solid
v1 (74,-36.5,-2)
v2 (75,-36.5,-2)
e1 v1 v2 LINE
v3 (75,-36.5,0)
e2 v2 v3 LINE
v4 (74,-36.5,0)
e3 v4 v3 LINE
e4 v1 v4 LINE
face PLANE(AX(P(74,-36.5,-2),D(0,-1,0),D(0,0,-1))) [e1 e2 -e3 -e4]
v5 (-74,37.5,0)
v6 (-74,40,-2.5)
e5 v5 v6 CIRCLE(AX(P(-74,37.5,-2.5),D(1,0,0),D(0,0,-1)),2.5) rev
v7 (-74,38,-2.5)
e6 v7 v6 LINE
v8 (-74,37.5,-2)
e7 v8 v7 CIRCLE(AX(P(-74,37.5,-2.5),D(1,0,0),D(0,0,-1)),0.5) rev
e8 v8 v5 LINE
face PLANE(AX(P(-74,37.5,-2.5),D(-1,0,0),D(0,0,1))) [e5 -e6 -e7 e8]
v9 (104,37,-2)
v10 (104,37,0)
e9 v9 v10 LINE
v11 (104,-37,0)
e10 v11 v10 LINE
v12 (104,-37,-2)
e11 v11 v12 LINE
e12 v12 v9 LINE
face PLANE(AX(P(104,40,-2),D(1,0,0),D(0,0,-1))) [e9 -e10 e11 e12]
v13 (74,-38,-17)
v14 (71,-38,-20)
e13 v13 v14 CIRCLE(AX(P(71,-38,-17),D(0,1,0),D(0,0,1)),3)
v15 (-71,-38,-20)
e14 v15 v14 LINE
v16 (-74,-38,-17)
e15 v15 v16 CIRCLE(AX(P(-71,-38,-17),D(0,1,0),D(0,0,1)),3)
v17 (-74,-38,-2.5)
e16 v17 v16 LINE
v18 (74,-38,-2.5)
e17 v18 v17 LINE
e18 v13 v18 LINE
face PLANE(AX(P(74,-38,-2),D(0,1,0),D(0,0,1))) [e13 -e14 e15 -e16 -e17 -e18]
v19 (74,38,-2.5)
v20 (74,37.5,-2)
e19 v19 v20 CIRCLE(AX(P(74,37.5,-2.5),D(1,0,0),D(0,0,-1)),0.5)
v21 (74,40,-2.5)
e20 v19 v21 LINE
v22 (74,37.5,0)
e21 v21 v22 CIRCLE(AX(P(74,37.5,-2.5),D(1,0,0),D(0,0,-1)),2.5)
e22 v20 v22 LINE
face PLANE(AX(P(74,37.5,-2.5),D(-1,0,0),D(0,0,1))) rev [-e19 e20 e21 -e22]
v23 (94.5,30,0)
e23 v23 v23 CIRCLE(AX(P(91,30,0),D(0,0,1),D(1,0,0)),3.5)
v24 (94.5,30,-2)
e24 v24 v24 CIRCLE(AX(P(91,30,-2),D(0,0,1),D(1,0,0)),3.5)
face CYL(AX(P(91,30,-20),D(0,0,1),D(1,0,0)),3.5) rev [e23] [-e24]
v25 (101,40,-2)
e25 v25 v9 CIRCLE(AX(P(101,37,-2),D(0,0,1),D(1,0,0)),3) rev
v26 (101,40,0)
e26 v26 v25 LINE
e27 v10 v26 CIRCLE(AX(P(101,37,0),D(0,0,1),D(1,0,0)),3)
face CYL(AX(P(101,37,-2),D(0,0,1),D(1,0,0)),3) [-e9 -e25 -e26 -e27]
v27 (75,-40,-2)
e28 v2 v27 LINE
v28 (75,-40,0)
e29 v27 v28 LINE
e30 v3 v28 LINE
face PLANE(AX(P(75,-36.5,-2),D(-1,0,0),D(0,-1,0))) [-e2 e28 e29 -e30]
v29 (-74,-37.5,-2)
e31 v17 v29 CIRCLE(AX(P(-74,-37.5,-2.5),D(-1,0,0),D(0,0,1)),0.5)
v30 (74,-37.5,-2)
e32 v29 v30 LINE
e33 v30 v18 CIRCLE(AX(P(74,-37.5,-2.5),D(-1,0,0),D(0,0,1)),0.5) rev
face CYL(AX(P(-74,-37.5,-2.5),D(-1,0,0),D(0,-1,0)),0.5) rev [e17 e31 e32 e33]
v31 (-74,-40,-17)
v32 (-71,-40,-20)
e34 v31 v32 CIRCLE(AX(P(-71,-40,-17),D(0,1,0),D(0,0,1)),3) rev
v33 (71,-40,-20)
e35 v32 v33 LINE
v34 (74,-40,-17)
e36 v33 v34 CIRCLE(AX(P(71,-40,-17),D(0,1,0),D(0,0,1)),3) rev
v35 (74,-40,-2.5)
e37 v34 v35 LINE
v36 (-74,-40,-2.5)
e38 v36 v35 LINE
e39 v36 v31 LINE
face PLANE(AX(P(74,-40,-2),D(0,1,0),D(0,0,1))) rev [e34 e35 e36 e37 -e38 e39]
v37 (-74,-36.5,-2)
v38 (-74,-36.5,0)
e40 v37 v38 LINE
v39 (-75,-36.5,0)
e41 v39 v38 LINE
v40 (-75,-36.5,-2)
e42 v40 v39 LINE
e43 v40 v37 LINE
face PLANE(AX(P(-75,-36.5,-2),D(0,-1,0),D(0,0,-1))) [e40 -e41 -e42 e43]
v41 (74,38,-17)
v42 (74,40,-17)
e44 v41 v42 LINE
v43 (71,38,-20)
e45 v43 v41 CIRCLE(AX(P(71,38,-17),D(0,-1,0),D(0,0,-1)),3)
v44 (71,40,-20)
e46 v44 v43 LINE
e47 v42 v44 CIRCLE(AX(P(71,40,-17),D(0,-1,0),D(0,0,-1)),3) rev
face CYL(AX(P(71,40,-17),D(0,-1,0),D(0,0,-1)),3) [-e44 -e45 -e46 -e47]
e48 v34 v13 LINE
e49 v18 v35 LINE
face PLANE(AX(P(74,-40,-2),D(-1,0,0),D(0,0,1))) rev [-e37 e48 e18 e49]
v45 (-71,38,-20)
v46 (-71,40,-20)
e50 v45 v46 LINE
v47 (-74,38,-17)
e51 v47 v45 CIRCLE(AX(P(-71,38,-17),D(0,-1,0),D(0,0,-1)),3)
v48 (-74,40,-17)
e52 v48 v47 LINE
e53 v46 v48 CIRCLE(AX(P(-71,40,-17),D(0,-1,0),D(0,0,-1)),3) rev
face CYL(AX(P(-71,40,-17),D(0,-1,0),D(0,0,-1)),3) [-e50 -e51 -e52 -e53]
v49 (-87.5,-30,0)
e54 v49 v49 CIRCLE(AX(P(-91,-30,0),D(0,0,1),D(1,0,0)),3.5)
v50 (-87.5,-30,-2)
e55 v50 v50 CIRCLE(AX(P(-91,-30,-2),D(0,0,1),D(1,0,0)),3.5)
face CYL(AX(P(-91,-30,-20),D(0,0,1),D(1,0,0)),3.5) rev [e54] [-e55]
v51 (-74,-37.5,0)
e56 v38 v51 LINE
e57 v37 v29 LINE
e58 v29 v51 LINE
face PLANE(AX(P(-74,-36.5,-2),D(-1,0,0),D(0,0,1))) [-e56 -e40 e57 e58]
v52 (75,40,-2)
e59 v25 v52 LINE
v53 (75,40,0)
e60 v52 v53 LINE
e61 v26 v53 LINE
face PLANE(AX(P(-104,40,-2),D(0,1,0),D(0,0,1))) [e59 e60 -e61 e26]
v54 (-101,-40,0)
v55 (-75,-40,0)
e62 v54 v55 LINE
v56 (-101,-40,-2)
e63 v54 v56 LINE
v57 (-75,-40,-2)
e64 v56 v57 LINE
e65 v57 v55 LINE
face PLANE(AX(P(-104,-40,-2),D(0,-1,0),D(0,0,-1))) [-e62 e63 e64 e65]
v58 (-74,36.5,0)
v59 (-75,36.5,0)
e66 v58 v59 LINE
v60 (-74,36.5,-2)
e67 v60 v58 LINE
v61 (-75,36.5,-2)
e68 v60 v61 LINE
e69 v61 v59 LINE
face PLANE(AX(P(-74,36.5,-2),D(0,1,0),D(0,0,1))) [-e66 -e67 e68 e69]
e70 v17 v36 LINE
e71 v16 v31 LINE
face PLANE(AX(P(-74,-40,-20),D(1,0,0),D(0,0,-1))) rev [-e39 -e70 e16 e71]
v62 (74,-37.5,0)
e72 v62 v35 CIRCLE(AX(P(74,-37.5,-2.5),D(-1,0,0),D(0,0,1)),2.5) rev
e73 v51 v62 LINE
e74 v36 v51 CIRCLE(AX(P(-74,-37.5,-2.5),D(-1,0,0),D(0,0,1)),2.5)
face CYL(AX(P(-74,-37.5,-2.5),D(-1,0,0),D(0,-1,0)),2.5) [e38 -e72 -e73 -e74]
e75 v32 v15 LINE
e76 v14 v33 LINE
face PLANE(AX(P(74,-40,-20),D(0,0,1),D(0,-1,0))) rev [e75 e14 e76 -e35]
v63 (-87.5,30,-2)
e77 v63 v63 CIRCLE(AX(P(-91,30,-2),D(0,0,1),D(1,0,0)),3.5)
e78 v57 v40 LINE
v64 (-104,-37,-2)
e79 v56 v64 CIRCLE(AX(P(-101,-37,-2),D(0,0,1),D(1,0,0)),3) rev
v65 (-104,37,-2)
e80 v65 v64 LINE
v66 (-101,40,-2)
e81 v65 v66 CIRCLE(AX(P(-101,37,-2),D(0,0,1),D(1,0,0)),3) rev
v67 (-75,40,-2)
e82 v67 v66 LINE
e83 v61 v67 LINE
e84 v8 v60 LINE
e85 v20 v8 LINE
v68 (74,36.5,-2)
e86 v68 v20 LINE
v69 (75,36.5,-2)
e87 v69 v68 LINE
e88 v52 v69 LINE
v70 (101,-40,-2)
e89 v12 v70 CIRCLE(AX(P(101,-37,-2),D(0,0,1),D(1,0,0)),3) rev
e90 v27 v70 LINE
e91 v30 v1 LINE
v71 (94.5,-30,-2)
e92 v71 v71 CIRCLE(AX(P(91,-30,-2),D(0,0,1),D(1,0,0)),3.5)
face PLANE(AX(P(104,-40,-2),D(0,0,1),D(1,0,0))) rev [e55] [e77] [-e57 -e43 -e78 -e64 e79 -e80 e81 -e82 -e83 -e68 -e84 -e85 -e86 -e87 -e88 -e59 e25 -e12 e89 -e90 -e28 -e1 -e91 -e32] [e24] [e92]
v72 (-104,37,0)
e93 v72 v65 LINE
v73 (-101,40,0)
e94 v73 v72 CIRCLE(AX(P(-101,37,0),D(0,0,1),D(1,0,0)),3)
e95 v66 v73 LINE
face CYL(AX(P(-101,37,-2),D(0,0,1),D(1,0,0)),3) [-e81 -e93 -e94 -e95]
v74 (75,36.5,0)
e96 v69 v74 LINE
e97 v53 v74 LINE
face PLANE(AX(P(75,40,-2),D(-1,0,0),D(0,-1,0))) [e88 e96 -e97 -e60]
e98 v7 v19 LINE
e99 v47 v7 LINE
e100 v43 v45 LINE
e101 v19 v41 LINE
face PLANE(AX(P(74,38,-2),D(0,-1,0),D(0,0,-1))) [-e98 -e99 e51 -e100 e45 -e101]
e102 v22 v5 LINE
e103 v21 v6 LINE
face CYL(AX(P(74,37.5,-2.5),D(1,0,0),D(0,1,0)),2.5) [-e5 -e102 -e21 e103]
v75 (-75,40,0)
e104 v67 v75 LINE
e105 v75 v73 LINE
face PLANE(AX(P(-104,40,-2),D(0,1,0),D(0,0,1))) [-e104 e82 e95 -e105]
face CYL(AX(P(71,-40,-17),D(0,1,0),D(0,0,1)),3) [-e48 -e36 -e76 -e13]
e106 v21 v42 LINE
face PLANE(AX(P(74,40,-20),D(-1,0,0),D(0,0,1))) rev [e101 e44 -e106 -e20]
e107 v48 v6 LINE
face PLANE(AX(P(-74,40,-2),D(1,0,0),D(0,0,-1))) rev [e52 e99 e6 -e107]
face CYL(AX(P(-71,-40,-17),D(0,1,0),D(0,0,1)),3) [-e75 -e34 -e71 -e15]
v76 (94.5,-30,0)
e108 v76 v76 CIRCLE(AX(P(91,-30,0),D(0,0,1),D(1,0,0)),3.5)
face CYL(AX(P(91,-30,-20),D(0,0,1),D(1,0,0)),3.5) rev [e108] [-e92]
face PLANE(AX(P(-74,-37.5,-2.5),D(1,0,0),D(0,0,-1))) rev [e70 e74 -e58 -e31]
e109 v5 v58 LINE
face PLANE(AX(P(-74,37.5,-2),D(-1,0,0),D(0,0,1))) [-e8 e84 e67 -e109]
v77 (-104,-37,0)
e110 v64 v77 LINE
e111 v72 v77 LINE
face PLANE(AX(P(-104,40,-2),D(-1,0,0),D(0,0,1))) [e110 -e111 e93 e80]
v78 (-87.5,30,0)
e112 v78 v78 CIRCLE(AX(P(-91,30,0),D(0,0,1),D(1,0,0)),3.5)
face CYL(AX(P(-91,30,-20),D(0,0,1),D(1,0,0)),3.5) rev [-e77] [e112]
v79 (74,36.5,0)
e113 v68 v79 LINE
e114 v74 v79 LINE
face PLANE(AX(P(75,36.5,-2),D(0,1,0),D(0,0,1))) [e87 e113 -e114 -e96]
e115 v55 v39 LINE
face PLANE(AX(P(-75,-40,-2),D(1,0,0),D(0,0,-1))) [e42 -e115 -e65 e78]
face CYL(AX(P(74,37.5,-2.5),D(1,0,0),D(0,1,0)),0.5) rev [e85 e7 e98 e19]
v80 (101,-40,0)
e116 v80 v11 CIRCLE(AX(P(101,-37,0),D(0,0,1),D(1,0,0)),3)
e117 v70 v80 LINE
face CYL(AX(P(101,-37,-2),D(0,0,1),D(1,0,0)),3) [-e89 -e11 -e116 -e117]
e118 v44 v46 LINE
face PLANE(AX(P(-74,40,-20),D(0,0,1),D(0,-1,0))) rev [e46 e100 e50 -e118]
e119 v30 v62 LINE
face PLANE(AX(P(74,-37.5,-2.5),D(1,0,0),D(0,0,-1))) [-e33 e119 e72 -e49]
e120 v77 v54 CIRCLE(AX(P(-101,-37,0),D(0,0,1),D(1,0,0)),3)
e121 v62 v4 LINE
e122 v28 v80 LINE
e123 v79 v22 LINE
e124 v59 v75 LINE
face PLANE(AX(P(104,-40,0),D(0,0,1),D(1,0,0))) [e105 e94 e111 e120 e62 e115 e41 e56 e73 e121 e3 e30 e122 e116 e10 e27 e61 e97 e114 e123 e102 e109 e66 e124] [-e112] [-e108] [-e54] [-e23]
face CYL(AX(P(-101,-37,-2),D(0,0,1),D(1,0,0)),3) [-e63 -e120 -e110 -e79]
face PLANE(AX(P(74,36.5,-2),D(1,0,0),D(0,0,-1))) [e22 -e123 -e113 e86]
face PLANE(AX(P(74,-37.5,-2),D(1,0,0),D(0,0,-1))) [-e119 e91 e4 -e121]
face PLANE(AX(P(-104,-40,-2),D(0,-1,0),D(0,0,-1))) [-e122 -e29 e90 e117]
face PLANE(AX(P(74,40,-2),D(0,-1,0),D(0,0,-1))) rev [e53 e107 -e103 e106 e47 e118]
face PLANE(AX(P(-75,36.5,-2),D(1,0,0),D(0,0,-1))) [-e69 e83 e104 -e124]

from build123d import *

# Parameters (mm, degrees)
SKETCH_1_W                        = 208
SKETCH_1_H                        = 80
SM_BASE_FLANGE_1_DEPTH            = 2
SM_EDGE_FLANGE_1_STRIP_W          = 9
SM_EDGE_FLANGE_1_STRIP_H          = 2
SM_EDGE_FLANGE_1_STRIP_CUT_DEPTH  = 148
SM_EDGE_FLANGE_1_RELIEF_W         = 10
SM_EDGE_FLANGE_1_RELIEF_H         = 1
SM_EDGE_FLANGE_1_RELIEF_CUT_DEPTH = 2
SM_EDGE_FLANGE_1_DEPTH            = 148
SM_EDGE_FLANGE_2_STRIP_W          = 9
SM_EDGE_FLANGE_2_STRIP_H          = 2
SM_EDGE_FLANGE_2_STRIP_CUT_DEPTH  = 148
SM_EDGE_FLANGE_2_RELIEF_W         = 10
SM_EDGE_FLANGE_2_RELIEF_H         = 1
SM_EDGE_FLANGE_2_RELIEF_CUT_DEPTH = 2
SM_EDGE_FLANGE_2_DEPTH            = 148
SKETCH_10_R                       = 3.5
CUT_EXTRUDE_1_DEPTH               = 114.207773585
FILLET_1_R                        = 3


# Sheet-metal steps are written as plain solids
with BuildPart() as part:
    # Sketch 1 → 基体-法兰1 (new body)
    with BuildSketch(Plane.XY):
        Rectangle(SKETCH_1_W, SKETCH_1_H)
    extrude(amount=-SM_BASE_FLANGE_1_DEPTH)

    # 边线-法兰1 strip (across the edge) → 边线-法兰1 strip cut (cut)
    with BuildSketch(Plane(origin=(-74, 40, -2), x_dir=(0, -1, 0), z_dir=(1, 0, 0))):
        with Locations((-2, -1)):
            Rectangle(SM_EDGE_FLANGE_1_STRIP_W, SM_EDGE_FLANGE_1_STRIP_H)
    extrude(amount=SM_EDGE_FLANGE_1_STRIP_CUT_DEPTH, mode=Mode.SUBTRACT)

    # 边线-法兰1 relief (on the sheet) → 边线-法兰1 relief cut (cut)
    with BuildSketch(Plane(origin=(-74, 37.5, -2), x_dir=(0, -1, 0), z_dir=(0, 0, -1))):
        with Locations((-4, 0.5)):
            Rectangle(SM_EDGE_FLANGE_1_RELIEF_W, SM_EDGE_FLANGE_1_RELIEF_H)
        with Locations((-4, -148.5)):
            Rectangle(SM_EDGE_FLANGE_1_RELIEF_W, SM_EDGE_FLANGE_1_RELIEF_H)
    extrude(amount=-SM_EDGE_FLANGE_1_RELIEF_CUT_DEPTH, mode=Mode.SUBTRACT)

    # 边线-法兰1 section (across the edge) → 边线-法兰1 (add)
    with BuildSketch(Plane(origin=(-74, 40, -2), x_dir=(0, -1, 0), z_dir=(1, 0, 0))):
        with BuildLine():
            Line((0, 0.5), (0, 18))
            Line((0, 18), (2, 18))
            Line((2, 18), (2, 0.5))
            ThreePointArc((2, 0.5), (2.146446609, 0.146446609), (2.5, 0))
            Line((2.5, 0), (2.5, -2))
            ThreePointArc((2.5, -2), (0.732233047, -1.267766953), (0, 0.5))
        make_face()
    extrude(amount=SM_EDGE_FLANGE_1_DEPTH)

    # 边线-法兰2 strip (across the edge) → 边线-法兰2 strip cut (cut)
    with BuildSketch(Plane(origin=(74, -40, -2), x_dir=(0, 1, 0), z_dir=(-1, 0, 0))):
        with Locations((-2, -1)):
            Rectangle(SM_EDGE_FLANGE_2_STRIP_W, SM_EDGE_FLANGE_2_STRIP_H)
    extrude(amount=SM_EDGE_FLANGE_2_STRIP_CUT_DEPTH, mode=Mode.SUBTRACT)

    # 边线-法兰2 relief (on the sheet) → 边线-法兰2 relief cut (cut)
    with BuildSketch(Plane(origin=(74, -37.5, -2), x_dir=(0, 1, 0), z_dir=(0, 0, -1))):
        with Locations((-4, 0.5)):
            Rectangle(SM_EDGE_FLANGE_2_RELIEF_W, SM_EDGE_FLANGE_2_RELIEF_H)
        with Locations((-4, -148.5)):
            Rectangle(SM_EDGE_FLANGE_2_RELIEF_W, SM_EDGE_FLANGE_2_RELIEF_H)
    extrude(amount=-SM_EDGE_FLANGE_2_RELIEF_CUT_DEPTH, mode=Mode.SUBTRACT)

    # 边线-法兰2 section (across the edge) → 边线-法兰2 (add)
    with BuildSketch(Plane(origin=(74, -40, -2), x_dir=(0, 1, 0), z_dir=(-1, 0, 0))):
        with BuildLine():
            Line((0, 0.5), (0, 18))
            Line((0, 18), (2, 18))
            Line((2, 18), (2, 0.5))
            ThreePointArc((2, 0.5), (2.146446609, 0.146446609), (2.5, 0))
            Line((2.5, 0), (2.5, -2))
            ThreePointArc((2.5, -2), (0.732233047, -1.267766953), (0, 0.5))
        make_face()
    extrude(amount=SM_EDGE_FLANGE_2_DEPTH)

    # 草图10 → 切除-拉伸1 (cut, through all)
    with BuildSketch(Plane.XY):
        with Locations((91, -30)):
            Circle(SKETCH_10_R)
        with Locations((91, 30)):
            Circle(SKETCH_10_R)
        with Locations((-91, -30)):
            Circle(SKETCH_10_R)
        with Locations((-91, 30)):
            Circle(SKETCH_10_R)
    extrude(amount=-CUT_EXTRUDE_1_DEPTH, mode=Mode.SUBTRACT)

    # 圆角1
    fillet_1_edges = [part.edges().sort_by_distance(p)[0] for p in [
        (-74, 39, -20),
        (74, 39, -20),
        (104, -40, -1),
        (-104, -40, -1),
        (-104, 40, -1),
        (104, 40, -1),
        (74, -39, -20),
        (-74, -39, -20),
    ]]
    fillet(fillet_1_edges, radius=FILLET_1_R)


solid = part.part
